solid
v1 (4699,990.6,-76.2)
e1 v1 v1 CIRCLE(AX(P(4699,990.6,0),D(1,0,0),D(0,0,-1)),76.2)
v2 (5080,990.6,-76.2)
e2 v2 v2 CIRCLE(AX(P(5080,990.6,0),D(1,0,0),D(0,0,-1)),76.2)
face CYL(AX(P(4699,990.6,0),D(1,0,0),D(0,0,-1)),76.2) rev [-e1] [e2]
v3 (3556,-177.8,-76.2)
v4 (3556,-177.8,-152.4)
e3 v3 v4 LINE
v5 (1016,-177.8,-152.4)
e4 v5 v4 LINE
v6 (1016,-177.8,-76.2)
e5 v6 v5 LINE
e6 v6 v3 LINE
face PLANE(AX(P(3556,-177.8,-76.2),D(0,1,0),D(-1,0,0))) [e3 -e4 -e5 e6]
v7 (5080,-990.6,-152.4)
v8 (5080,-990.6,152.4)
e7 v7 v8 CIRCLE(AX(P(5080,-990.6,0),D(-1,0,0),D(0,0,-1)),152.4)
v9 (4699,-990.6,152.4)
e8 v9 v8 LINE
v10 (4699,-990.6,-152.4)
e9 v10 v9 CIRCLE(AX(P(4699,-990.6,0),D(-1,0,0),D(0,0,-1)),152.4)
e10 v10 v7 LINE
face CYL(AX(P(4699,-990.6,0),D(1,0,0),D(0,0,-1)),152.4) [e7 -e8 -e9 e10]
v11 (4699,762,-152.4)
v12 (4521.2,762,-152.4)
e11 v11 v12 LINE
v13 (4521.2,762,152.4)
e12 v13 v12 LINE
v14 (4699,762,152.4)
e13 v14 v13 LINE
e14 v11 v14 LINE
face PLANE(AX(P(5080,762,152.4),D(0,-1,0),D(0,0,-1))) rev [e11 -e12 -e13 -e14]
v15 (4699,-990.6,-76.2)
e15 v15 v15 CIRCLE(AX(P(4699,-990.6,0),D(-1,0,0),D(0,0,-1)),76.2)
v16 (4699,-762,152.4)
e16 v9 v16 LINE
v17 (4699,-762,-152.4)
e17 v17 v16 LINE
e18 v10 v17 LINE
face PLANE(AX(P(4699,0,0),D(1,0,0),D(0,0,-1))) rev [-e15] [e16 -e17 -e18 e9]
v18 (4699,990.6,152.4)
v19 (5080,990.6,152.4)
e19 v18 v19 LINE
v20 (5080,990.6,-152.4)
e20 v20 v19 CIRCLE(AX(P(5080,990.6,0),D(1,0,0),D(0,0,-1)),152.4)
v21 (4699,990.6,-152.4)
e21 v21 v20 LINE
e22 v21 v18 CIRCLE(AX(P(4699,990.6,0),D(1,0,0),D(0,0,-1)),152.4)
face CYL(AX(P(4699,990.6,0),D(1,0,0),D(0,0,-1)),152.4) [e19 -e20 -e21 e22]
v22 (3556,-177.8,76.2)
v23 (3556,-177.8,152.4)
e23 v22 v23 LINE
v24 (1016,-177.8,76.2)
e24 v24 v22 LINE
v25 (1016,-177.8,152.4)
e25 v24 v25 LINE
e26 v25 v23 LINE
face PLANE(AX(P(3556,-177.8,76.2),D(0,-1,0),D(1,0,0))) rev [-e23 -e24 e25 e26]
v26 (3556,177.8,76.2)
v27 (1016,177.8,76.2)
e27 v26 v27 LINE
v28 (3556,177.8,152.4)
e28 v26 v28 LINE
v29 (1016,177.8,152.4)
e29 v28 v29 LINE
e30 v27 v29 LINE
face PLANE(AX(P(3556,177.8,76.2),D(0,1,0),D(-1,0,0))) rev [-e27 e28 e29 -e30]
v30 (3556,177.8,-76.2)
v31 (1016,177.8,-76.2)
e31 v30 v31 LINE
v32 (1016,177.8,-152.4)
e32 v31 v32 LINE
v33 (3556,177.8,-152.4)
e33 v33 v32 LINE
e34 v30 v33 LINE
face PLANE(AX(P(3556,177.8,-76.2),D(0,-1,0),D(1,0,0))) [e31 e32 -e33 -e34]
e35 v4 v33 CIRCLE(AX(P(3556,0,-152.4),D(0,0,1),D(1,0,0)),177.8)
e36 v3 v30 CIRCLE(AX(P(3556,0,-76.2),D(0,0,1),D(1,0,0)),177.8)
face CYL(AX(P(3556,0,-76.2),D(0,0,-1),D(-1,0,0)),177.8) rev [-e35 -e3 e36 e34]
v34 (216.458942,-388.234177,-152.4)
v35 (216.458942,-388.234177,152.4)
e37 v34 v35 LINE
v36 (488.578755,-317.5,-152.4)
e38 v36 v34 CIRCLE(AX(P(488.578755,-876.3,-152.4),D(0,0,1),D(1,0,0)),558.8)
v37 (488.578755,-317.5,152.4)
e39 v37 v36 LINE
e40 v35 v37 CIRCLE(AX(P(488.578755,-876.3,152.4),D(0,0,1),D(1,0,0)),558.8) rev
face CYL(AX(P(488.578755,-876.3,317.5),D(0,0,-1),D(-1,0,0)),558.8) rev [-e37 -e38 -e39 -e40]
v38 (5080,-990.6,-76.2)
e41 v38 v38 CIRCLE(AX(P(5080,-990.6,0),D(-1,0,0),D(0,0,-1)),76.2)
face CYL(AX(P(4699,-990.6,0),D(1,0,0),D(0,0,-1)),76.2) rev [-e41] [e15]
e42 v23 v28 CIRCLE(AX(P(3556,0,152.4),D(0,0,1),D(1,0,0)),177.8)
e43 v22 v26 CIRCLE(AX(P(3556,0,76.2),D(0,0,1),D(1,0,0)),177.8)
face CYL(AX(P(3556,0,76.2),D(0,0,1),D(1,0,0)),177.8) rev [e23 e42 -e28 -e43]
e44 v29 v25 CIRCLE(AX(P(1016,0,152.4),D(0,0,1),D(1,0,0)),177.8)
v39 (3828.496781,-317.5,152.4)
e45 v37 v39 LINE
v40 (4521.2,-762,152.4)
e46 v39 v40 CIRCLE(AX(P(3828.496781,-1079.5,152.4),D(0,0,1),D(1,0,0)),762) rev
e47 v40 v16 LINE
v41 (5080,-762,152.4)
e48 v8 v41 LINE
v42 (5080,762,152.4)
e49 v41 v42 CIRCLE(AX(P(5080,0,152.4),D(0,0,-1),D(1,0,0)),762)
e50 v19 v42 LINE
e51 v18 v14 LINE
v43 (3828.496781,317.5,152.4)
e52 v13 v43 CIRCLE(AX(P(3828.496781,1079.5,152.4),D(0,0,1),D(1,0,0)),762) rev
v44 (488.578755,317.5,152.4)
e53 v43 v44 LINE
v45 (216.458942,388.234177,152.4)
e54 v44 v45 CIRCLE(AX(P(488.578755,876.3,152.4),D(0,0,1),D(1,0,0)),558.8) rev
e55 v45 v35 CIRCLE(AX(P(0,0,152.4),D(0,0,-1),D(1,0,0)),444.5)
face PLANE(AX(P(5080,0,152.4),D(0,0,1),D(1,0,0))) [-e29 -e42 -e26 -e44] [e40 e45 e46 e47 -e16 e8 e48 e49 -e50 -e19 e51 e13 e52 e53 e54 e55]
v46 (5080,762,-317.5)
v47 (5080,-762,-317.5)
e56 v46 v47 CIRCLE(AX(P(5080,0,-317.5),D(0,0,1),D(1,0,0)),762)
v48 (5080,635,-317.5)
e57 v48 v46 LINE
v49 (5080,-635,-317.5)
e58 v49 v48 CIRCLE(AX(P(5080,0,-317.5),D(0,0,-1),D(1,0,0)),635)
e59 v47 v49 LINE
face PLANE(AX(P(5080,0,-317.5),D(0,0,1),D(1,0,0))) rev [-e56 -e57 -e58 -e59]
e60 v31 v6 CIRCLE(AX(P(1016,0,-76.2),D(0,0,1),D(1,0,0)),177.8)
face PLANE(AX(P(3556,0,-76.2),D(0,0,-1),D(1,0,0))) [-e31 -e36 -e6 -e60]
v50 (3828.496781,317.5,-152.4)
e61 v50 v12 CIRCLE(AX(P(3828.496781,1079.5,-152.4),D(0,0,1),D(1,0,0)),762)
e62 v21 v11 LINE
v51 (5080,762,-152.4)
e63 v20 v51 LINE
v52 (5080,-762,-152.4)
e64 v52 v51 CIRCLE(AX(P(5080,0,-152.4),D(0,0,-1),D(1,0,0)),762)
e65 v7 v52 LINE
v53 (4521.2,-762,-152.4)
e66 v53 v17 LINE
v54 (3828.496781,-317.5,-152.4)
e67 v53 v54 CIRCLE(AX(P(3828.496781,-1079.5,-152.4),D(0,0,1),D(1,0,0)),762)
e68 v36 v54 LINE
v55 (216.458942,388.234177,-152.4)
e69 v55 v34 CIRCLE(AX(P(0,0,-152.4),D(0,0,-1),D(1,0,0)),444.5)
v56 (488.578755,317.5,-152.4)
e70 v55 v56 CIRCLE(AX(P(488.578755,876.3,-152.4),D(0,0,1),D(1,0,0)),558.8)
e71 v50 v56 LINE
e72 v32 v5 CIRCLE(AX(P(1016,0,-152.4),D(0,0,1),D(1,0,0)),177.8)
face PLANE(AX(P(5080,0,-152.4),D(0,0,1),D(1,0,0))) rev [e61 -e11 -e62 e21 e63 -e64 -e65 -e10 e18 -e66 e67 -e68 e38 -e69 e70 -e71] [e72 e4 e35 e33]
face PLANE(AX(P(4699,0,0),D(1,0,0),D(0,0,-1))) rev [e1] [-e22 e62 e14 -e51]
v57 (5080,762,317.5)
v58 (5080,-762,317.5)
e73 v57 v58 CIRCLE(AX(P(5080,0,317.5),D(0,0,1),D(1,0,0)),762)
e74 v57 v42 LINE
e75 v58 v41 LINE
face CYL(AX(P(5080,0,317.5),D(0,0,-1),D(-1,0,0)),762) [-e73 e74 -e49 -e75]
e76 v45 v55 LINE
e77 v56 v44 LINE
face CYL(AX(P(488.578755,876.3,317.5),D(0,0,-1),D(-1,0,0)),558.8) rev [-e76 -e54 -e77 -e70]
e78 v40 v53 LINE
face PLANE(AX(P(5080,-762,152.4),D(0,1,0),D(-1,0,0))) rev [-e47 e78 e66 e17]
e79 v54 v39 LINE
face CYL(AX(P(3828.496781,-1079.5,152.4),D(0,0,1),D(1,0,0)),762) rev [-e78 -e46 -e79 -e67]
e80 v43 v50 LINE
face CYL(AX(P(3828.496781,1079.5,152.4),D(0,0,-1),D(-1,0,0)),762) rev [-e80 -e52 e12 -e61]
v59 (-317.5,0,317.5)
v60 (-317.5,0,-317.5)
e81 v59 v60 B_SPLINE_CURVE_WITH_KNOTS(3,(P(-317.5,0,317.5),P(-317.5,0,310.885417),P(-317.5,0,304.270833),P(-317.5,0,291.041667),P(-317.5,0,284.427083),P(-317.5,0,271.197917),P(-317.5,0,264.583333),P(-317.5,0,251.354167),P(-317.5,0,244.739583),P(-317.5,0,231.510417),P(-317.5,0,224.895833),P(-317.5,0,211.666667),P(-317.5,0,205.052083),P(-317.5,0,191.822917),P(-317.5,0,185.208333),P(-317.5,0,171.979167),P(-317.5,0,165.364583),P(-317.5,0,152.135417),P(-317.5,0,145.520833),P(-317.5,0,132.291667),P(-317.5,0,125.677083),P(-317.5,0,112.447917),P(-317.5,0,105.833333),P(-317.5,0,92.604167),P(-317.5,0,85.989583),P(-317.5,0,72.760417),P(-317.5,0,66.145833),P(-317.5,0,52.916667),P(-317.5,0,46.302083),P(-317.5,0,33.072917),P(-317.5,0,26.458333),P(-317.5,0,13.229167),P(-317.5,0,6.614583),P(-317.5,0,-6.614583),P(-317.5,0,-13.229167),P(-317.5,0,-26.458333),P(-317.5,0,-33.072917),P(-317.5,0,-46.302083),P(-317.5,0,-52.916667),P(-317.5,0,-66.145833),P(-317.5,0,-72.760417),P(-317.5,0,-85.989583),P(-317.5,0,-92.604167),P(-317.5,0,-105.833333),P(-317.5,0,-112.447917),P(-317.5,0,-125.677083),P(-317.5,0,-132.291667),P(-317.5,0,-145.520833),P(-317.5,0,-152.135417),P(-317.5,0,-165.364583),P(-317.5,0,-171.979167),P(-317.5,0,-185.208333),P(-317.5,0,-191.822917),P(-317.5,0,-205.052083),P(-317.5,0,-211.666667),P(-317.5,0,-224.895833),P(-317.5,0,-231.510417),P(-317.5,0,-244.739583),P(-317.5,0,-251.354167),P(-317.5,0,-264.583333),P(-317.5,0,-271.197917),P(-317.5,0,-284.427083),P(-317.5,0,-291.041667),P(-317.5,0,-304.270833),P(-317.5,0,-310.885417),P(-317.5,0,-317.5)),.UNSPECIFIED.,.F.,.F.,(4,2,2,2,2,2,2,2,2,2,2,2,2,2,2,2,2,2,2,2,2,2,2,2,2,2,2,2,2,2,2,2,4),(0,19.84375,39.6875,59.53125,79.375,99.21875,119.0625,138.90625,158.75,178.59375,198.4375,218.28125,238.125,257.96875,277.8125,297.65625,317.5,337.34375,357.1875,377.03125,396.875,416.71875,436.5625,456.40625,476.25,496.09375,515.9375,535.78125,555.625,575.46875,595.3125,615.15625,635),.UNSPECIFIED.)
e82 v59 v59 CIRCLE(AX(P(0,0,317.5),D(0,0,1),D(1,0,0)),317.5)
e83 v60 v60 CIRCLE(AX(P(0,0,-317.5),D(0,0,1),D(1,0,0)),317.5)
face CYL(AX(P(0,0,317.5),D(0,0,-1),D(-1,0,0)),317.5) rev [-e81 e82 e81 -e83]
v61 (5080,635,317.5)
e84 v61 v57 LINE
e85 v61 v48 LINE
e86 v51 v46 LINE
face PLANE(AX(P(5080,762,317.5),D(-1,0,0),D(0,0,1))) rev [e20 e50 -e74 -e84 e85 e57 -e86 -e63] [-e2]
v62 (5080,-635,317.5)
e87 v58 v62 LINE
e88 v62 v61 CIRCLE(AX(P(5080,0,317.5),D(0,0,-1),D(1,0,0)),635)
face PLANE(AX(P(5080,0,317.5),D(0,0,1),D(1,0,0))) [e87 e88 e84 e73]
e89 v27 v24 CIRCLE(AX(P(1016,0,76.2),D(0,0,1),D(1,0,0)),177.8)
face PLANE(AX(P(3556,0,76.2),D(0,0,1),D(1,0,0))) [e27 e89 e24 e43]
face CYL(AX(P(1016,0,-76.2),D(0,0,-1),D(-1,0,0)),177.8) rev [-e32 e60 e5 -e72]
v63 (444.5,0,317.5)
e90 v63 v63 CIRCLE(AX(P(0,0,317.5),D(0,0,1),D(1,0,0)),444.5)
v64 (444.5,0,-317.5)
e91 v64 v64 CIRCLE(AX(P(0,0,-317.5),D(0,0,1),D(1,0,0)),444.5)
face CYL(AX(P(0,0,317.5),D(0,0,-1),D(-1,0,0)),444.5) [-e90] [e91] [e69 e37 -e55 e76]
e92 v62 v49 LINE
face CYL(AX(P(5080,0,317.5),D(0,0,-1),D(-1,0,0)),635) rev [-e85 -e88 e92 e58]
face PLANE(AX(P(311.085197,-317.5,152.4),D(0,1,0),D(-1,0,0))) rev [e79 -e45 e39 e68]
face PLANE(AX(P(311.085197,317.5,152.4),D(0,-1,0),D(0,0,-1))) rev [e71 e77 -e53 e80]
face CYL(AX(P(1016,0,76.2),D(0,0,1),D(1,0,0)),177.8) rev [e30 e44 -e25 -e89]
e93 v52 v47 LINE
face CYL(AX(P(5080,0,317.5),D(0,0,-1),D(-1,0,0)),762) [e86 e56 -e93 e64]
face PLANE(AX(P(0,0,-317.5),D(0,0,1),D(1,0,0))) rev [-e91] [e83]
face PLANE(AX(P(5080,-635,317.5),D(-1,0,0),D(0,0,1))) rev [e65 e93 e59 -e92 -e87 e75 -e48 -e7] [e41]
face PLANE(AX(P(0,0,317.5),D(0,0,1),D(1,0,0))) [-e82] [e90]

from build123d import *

# Parameters (mm, degrees)
SKETCH1_R             = 444.5
SKETCH1_R_2           = 317.5
BOSS_EXTRUDE1_DEPTH   = 317.5
BOSS_EXTRUDE1_2_DEPTH = 317.5
BOSS_EXTRUDE2_DEPTH   = 152.4
FILLET1_R             = 558.8
FILLET2_R             = 762
SKETCH4_R             = 76.2
BOSS_EXTRUDE3_DEPTH   = 381
CUT_EXTRUDE1_DEPTH    = 76.2


with BuildPart() as part:
    # Sketch1 → Boss-Extrude1 (new, symmetric)
    with BuildSketch(Plane.XY):
        with Locations(Location((0, 0, 0), (0, 0, 180))):
            Circle(SKETCH1_R)
        with Locations(Location((0, 0, 0), (0, 0, 180))):
            Circle(SKETCH1_R_2, mode=Mode.SUBTRACT)
    extrude(amount=BOSS_EXTRUDE1_DEPTH, both=True)



with BuildPart() as body_2:
    # Sketch1 → Boss-Extrude1 2 (new, symmetric)
    with BuildSketch(Plane.XY):
        with BuildLine():
            Line((5080, 762), (5080, 635))
            ThreePointArc((5080, 635), (4445, 0), (5080, -635))
            Line((5080, -635), (5080, -762))
            ThreePointArc((5080, -762), (4318, 0), (5080, 762))
        make_face()
    extrude(amount=BOSS_EXTRUDE1_2_DEPTH, both=True)


with BuildPart() as part_1:
    add(part.part)

    add(body_2.part)  # Boss-Extrude2 merges body 2
    # Sketch2 → Boss-Extrude2 (add, symmetric)
    with BuildSketch(Plane.XY):
        with BuildLine():
            Line((311.085197333, 317.5), (4318, 317.5))
            Line((4318, 317.5), (4521.2, 762))
            Line((4521.2, 762), (5080, 762))
            ThreePointArc((5080, 762), (4318, 0), (5080, -762))
            Line((5080, -762), (4521.2, -762))
            Line((4521.2, -762), (4318, -317.5))
            Line((4318, -317.5), (311.085197333, -317.5))
            ThreePointArc((311.085197333, -317.5), (444.5, 0), (311.085197333, 317.5))
        make_face()
    extrude(amount=BOSS_EXTRUDE2_DEPTH, both=True)

    # Fillet1
    fillet1_edges = [part_1.edges().sort_by_distance(p)[0] for p in [
        (311.085197333, 317.5, 0),
        (311.085197333, -317.5, 0),
    ]]
    fillet(fillet1_edges, radius=FILLET1_R)

    # Fillet2
    # the kernel refuses this fillet: 762 mm, written as the material it adds along each edge
    with BuildSketch(Plane(origin=(4318, -317.5, -152.4), x_dir=(-1, 0, 0), z_dir=(0, 0, 1))) as fillet2_piece_1_section:
        with BuildLine():
            CenterArc((FILLET2_R * 0.642393223137, FILLET2_R), FILLET2_R, 204.567171321, 65.432828679)
            Line((-FILLET2_R * 0.267081252449, FILLET2_R * 0.584240239732), (0, 0))
            Line((0, 0), (FILLET2_R * 0.642393223137, 0))
        make_face()
    fillet2_piece_1 = extrude(amount=304.8, mode=Mode.PRIVATE)
    fillet2_piece_1 = split(fillet2_piece_1, bisect_by=Plane(origin=(4255.635899042, -762, 0), z_dir=(0, 1, 0)), keep=Keep.TOP, mode=Mode.PRIVATE)
    add(fillet2_piece_1)
    with BuildSketch(Plane(origin=(4318, 317.5, 152.4), x_dir=(0.4157597602677956, 0.9094744755857996, 0), z_dir=(0, 0, -1))) as fillet2_piece_2_section:
        with BuildLine():
            CenterArc((FILLET2_R * 0.642393223137, -FILLET2_R), FILLET2_R, 90, 65.432828679)
            Line((-FILLET2_R * 0.267081252449, -FILLET2_R * 0.584240239732), (0, 0))
            Line((0, 0), (FILLET2_R * 0.642393223137, 0))
        make_face()
    fillet2_piece_2 = extrude(amount=304.8, mode=Mode.PRIVATE)
    fillet2_piece_2 = split(fillet2_piece_2, bisect_by=Plane(origin=(4255.635899042, 762, 0), z_dir=(0, -1, 0)), keep=Keep.TOP, mode=Mode.PRIVATE)
    add(fillet2_piece_2)

    # Sketch4 → Boss-Extrude3 (add)
    with BuildSketch(Plane(origin=(5080, 0, 0), x_dir=(0, 0, -1), z_dir=(1, 0, 0))):
        with BuildLine():
            Line((152.4, 990.6), (152.4, 762))
            Line((152.4, 762), (-152.4, 762))
            Line((-152.4, 762), (-152.4, 990.6))
            ThreePointArc((-152.4, 990.6), (0, 1143), (152.4, 990.6))
        make_face()
        with Locations((0, 990.6)):
            Circle(SKETCH4_R, mode=Mode.SUBTRACT)
    boss_extrude3 = extrude(amount=-BOSS_EXTRUDE3_DEPTH)

    # Mirror1: Boss-Extrude3 across plane
    add(boss_extrude3.mirror(Plane.ZX))

    # Sketch5 → Cut-Extrude1 (cut)
    with BuildSketch(Plane.XY.offset(152.4)):
        with BuildLine():
            Line((3556, -177.8), (1016, -177.8))
            ThreePointArc((1016, -177.8), (838.2, 0), (1016, 177.8))
            Line((1016, 177.8), (3556, 177.8))
            ThreePointArc((3556, 177.8), (3733.8, 0), (3556, -177.8))
        make_face()
    cut_extrude1 = extrude(amount=-CUT_EXTRUDE1_DEPTH, mode=Mode.SUBTRACT)

    # Mirror2: Cut-Extrude1 across plane
    add(cut_extrude1.mirror(Plane.XY), mode=Mode.SUBTRACT)


solid = part_1.part
